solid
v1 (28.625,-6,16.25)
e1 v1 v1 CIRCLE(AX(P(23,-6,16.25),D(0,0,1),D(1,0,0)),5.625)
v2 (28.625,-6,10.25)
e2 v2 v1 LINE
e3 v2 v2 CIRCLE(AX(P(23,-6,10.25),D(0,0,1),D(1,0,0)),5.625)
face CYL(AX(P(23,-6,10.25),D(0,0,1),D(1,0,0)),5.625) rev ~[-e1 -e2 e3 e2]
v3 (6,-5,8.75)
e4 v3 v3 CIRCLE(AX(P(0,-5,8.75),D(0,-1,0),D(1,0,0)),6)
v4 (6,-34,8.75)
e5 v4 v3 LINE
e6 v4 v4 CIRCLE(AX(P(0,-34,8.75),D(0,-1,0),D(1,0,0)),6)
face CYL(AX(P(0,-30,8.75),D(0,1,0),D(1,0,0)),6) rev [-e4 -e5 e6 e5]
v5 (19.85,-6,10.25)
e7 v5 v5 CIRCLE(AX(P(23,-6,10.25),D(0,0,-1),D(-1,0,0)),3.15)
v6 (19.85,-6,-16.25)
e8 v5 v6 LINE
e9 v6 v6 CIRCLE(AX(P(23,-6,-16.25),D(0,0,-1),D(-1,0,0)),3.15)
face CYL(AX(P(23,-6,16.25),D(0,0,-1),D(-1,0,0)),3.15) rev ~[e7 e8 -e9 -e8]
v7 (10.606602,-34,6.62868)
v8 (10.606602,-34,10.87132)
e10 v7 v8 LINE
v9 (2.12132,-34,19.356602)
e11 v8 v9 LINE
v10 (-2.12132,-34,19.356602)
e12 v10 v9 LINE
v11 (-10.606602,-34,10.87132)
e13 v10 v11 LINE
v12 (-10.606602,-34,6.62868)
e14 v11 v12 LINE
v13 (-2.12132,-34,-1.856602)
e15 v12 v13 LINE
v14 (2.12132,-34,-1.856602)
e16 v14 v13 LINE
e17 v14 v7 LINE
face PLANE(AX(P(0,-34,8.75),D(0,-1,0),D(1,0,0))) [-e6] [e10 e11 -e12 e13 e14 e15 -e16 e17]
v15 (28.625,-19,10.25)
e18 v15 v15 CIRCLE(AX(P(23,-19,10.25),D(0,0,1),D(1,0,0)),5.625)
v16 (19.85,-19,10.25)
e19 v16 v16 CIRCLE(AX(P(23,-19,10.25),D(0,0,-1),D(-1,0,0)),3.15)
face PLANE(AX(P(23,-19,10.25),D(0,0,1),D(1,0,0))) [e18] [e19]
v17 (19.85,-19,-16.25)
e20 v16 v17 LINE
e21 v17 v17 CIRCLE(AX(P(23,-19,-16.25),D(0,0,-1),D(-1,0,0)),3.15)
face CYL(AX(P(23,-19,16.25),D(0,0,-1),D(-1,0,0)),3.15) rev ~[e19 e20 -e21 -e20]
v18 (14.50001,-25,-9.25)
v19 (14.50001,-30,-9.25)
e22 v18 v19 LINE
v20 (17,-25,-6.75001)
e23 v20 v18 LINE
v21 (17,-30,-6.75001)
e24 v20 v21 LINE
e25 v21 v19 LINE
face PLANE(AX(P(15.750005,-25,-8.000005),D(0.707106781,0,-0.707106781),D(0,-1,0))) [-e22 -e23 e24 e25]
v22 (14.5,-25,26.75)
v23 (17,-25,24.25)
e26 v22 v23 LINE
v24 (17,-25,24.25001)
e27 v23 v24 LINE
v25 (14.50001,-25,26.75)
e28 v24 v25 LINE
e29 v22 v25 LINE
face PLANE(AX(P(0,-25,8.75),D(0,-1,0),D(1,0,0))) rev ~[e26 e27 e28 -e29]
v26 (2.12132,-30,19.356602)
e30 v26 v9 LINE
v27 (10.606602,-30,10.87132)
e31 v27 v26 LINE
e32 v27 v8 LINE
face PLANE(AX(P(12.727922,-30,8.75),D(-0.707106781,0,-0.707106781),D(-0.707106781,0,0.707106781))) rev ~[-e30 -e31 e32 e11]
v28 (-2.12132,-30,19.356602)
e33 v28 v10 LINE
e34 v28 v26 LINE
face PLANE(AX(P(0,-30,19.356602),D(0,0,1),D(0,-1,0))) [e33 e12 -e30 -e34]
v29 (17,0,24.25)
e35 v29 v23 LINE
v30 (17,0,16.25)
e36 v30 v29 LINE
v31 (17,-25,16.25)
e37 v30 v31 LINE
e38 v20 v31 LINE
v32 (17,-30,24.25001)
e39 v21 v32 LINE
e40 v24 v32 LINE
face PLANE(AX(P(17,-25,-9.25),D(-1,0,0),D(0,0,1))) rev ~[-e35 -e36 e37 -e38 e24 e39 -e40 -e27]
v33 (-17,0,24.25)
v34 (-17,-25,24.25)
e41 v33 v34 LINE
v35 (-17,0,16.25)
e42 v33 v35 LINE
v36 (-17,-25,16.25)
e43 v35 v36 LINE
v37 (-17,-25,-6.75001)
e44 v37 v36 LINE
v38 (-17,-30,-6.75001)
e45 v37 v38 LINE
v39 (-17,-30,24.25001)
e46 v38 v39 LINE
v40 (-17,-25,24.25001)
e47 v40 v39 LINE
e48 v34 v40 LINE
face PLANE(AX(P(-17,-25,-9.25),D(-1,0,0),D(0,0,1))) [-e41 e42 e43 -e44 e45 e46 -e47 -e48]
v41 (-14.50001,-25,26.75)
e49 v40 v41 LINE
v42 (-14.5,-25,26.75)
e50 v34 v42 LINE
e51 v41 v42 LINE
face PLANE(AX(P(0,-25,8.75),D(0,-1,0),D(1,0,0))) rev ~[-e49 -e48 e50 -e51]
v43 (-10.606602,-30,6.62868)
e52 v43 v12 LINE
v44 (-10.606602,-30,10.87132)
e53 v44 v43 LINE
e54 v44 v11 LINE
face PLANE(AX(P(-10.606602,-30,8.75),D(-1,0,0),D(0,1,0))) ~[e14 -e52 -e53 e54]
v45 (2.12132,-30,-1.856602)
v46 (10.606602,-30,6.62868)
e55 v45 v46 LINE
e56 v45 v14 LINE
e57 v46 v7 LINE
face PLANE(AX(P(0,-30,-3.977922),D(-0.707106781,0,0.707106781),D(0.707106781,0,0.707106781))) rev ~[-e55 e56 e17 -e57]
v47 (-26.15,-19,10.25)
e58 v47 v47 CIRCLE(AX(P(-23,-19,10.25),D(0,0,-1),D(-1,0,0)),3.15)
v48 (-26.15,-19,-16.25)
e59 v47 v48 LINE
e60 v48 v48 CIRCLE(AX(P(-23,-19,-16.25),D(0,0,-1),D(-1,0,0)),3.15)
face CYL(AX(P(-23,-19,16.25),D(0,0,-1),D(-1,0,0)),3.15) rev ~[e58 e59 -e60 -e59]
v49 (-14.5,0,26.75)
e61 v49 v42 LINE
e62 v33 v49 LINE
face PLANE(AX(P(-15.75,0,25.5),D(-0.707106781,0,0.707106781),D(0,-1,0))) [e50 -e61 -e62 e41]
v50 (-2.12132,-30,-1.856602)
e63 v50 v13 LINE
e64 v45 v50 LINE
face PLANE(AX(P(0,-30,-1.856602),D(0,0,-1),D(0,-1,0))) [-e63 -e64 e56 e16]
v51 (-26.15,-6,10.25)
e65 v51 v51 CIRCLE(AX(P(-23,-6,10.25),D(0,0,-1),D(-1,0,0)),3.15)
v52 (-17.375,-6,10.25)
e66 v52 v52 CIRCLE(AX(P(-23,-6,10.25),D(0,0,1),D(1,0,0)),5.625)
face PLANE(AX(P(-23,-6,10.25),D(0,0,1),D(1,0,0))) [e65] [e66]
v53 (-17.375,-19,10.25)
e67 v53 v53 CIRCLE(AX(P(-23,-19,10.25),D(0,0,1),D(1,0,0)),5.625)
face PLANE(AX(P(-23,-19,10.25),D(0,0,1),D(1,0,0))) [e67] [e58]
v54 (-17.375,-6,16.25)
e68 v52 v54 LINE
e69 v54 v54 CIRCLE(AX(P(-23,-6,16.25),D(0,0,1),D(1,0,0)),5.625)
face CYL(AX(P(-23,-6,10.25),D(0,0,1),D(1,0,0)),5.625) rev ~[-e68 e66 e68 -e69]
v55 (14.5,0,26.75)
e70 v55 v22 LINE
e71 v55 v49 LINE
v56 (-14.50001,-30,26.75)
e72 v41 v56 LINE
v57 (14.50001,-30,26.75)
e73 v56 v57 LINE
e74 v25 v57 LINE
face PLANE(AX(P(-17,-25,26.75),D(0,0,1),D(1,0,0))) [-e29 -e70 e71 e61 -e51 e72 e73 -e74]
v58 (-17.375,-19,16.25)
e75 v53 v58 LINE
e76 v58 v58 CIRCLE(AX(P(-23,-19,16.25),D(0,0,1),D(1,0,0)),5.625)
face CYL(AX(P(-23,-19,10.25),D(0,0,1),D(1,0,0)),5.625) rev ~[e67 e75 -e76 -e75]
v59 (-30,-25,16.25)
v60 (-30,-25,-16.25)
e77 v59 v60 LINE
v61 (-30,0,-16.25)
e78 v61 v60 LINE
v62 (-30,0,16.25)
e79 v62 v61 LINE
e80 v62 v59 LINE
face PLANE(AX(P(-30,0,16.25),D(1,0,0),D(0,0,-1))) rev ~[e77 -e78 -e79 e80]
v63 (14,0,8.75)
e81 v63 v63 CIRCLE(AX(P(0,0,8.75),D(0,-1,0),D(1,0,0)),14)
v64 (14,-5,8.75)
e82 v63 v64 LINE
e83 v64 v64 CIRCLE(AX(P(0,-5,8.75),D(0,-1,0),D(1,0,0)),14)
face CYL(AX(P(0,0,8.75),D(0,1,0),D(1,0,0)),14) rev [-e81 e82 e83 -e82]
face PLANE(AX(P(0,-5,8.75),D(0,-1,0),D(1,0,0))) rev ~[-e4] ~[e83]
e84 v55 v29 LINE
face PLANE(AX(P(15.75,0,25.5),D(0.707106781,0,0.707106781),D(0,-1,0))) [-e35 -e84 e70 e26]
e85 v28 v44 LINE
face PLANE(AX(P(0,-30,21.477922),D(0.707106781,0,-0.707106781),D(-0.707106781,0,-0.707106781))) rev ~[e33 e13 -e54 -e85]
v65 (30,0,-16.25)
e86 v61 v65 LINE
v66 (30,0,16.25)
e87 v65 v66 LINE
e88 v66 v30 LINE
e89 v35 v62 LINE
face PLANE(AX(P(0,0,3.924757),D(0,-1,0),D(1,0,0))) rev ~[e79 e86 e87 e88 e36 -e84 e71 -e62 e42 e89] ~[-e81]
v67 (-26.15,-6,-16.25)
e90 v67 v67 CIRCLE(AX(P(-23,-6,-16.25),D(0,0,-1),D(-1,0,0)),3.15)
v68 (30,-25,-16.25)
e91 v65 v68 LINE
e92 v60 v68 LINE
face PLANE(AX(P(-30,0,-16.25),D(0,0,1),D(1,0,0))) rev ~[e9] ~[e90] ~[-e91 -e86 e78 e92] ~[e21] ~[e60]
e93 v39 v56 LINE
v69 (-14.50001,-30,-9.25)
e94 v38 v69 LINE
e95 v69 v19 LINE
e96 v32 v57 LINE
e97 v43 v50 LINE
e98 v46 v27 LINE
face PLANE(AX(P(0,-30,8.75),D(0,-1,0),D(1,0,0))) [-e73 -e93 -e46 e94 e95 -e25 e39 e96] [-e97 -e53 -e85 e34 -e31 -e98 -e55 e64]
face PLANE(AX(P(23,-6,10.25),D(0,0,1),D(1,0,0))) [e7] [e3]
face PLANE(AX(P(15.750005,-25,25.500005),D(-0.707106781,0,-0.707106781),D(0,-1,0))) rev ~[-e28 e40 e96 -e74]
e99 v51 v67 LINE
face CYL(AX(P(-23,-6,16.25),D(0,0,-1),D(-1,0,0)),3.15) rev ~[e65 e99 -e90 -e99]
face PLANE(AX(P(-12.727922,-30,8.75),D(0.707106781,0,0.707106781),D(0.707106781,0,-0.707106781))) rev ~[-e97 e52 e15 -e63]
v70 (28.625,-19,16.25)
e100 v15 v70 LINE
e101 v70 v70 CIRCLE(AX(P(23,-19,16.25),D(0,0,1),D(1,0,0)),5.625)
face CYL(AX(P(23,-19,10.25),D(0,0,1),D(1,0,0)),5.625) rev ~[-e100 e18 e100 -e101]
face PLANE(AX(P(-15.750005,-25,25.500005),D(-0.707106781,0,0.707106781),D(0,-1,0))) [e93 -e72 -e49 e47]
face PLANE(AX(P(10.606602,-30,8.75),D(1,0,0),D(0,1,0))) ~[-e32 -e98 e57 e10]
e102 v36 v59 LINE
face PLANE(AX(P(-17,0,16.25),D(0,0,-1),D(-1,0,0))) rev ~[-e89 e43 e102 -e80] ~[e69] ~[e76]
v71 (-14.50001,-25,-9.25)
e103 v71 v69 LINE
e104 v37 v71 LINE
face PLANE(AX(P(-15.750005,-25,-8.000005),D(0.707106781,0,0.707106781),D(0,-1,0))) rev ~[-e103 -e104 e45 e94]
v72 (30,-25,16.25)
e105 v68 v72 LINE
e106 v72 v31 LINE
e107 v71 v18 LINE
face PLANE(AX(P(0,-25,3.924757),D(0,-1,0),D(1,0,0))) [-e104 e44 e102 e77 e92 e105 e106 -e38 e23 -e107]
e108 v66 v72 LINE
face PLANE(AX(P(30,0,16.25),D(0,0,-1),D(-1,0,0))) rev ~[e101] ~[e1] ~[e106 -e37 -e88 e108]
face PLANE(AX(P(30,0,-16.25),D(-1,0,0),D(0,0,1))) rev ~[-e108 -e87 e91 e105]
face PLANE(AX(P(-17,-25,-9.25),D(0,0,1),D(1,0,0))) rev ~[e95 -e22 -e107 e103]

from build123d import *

# Parameters (mm, degrees)
F0_R           = 14
F0_R_2         = 6
F1_DEPTH       = 25
F3_D           = 6.3
F3_CBORE_D     = 11.25
F3_CBORE_DEPTH = 6
F4_SIZE        = 2.5
F5_W           = 34
F5_H           = 36
F5_R           = 6
F6_DEPTH       = 5
F7_SIZE        = 2.49999
F8_R           = 6
F9_DEPTH       = 4
F10_SIZE       = 3
F11_DEPTH      = 5


# Not quite as in the source:
# - a fillet or chamfer is up to 0.001 mm smaller than in the source, because OpenCascade refuses the exact size
# - a feature names something its author has since deleted; it is built from what else it names


with BuildPart() as f1:
    # F0 (on Front) → F1 (new body)
    with BuildSketch(Plane.XZ):
        Polygon((-30, 16.25), (-30, -16.25), (30, -16.25), (30, 16.25), (17, 16.25), (17, 26.75), (-17, 26.75), (-17, 16.25), align=None)
        with Locations((0, 8.75)):
            Circle(F0_R, mode=Mode.SUBTRACT)
        with Locations((0, 8.75)):
            Circle(F0_R)
        with Locations((0, 8.75)):
            Circle(F0_R_2, mode=Mode.SUBTRACT)
    extrude(amount=F1_DEPTH)

    # F3 (through all)
    with Locations(Plane.XY.offset(16.25)):
        with Locations((-23, -6), (-23, -19), (23, -6), (23, -19)):
            CounterBoreHole(F3_D / 2, F3_CBORE_D / 2, F3_CBORE_DEPTH)

    # F4
    f4_edges = [f1.edges().sort_by_distance(p)[0] for p in [
        (17, -12.5, 26.75),
        (-17, -12.5, 26.75),
    ]]
    chamfer(f4_edges, length=F4_SIZE)

    # F5 (on face) → F6 (join)
    with BuildSketch(Plane.XZ.offset(25)):
        with Locations((0, 8.75)):
            Rectangle(F5_W, F5_H)
        with Locations((0, 8.75)):
            Circle(F5_R, mode=Mode.SUBTRACT)
    extrude(amount=F6_DEPTH)

    # F7 (size 2.5 in the source; OpenCascade refuses exactly that, so slightly less here)
    f7_edges = [f1.edges().sort_by_distance(p)[0] for p in [
        (17, -27.5, 26.75),
        (-17, -27.5, 26.75),
        (17, -27.5, -9.25),
        (-17, -27.5, -9.25),
    ]]
    chamfer(f7_edges, length=F7_SIZE)

    # F8 (on face) → F9 (join)
    with BuildSketch(Plane.XZ.offset(30)):
        Polygon((0, 21.4779220614), (-12.7279220614, 8.75), (0, -3.9779220614), (12.7279220614, 8.75), align=None)
        with Locations((0, 8.75)):
            Circle(F8_R, mode=Mode.SUBTRACT)
    extrude(amount=F9_DEPTH)

    # F10
    f10_edges = [f1.edges().sort_by_distance(p)[0] for p in [
        (0, -32, 21.477922),
        (12.727922, -32, 8.75),
        (-12.727922, -32, 8.75),
        (0, -32, -3.977922),
    ]]
    chamfer(f10_edges, length=F10_SIZE)

    # F0 (on Front) → F11 (cut)
    with BuildSketch(Plane.XZ):
        with Locations((0, 8.75)):
            Circle(F0_R)
        with Locations((0, 8.75)):
            Circle(F0_R_2, mode=Mode.SUBTRACT)
    extrude(amount=F11_DEPTH, mode=Mode.SUBTRACT)


solid = f1.part
